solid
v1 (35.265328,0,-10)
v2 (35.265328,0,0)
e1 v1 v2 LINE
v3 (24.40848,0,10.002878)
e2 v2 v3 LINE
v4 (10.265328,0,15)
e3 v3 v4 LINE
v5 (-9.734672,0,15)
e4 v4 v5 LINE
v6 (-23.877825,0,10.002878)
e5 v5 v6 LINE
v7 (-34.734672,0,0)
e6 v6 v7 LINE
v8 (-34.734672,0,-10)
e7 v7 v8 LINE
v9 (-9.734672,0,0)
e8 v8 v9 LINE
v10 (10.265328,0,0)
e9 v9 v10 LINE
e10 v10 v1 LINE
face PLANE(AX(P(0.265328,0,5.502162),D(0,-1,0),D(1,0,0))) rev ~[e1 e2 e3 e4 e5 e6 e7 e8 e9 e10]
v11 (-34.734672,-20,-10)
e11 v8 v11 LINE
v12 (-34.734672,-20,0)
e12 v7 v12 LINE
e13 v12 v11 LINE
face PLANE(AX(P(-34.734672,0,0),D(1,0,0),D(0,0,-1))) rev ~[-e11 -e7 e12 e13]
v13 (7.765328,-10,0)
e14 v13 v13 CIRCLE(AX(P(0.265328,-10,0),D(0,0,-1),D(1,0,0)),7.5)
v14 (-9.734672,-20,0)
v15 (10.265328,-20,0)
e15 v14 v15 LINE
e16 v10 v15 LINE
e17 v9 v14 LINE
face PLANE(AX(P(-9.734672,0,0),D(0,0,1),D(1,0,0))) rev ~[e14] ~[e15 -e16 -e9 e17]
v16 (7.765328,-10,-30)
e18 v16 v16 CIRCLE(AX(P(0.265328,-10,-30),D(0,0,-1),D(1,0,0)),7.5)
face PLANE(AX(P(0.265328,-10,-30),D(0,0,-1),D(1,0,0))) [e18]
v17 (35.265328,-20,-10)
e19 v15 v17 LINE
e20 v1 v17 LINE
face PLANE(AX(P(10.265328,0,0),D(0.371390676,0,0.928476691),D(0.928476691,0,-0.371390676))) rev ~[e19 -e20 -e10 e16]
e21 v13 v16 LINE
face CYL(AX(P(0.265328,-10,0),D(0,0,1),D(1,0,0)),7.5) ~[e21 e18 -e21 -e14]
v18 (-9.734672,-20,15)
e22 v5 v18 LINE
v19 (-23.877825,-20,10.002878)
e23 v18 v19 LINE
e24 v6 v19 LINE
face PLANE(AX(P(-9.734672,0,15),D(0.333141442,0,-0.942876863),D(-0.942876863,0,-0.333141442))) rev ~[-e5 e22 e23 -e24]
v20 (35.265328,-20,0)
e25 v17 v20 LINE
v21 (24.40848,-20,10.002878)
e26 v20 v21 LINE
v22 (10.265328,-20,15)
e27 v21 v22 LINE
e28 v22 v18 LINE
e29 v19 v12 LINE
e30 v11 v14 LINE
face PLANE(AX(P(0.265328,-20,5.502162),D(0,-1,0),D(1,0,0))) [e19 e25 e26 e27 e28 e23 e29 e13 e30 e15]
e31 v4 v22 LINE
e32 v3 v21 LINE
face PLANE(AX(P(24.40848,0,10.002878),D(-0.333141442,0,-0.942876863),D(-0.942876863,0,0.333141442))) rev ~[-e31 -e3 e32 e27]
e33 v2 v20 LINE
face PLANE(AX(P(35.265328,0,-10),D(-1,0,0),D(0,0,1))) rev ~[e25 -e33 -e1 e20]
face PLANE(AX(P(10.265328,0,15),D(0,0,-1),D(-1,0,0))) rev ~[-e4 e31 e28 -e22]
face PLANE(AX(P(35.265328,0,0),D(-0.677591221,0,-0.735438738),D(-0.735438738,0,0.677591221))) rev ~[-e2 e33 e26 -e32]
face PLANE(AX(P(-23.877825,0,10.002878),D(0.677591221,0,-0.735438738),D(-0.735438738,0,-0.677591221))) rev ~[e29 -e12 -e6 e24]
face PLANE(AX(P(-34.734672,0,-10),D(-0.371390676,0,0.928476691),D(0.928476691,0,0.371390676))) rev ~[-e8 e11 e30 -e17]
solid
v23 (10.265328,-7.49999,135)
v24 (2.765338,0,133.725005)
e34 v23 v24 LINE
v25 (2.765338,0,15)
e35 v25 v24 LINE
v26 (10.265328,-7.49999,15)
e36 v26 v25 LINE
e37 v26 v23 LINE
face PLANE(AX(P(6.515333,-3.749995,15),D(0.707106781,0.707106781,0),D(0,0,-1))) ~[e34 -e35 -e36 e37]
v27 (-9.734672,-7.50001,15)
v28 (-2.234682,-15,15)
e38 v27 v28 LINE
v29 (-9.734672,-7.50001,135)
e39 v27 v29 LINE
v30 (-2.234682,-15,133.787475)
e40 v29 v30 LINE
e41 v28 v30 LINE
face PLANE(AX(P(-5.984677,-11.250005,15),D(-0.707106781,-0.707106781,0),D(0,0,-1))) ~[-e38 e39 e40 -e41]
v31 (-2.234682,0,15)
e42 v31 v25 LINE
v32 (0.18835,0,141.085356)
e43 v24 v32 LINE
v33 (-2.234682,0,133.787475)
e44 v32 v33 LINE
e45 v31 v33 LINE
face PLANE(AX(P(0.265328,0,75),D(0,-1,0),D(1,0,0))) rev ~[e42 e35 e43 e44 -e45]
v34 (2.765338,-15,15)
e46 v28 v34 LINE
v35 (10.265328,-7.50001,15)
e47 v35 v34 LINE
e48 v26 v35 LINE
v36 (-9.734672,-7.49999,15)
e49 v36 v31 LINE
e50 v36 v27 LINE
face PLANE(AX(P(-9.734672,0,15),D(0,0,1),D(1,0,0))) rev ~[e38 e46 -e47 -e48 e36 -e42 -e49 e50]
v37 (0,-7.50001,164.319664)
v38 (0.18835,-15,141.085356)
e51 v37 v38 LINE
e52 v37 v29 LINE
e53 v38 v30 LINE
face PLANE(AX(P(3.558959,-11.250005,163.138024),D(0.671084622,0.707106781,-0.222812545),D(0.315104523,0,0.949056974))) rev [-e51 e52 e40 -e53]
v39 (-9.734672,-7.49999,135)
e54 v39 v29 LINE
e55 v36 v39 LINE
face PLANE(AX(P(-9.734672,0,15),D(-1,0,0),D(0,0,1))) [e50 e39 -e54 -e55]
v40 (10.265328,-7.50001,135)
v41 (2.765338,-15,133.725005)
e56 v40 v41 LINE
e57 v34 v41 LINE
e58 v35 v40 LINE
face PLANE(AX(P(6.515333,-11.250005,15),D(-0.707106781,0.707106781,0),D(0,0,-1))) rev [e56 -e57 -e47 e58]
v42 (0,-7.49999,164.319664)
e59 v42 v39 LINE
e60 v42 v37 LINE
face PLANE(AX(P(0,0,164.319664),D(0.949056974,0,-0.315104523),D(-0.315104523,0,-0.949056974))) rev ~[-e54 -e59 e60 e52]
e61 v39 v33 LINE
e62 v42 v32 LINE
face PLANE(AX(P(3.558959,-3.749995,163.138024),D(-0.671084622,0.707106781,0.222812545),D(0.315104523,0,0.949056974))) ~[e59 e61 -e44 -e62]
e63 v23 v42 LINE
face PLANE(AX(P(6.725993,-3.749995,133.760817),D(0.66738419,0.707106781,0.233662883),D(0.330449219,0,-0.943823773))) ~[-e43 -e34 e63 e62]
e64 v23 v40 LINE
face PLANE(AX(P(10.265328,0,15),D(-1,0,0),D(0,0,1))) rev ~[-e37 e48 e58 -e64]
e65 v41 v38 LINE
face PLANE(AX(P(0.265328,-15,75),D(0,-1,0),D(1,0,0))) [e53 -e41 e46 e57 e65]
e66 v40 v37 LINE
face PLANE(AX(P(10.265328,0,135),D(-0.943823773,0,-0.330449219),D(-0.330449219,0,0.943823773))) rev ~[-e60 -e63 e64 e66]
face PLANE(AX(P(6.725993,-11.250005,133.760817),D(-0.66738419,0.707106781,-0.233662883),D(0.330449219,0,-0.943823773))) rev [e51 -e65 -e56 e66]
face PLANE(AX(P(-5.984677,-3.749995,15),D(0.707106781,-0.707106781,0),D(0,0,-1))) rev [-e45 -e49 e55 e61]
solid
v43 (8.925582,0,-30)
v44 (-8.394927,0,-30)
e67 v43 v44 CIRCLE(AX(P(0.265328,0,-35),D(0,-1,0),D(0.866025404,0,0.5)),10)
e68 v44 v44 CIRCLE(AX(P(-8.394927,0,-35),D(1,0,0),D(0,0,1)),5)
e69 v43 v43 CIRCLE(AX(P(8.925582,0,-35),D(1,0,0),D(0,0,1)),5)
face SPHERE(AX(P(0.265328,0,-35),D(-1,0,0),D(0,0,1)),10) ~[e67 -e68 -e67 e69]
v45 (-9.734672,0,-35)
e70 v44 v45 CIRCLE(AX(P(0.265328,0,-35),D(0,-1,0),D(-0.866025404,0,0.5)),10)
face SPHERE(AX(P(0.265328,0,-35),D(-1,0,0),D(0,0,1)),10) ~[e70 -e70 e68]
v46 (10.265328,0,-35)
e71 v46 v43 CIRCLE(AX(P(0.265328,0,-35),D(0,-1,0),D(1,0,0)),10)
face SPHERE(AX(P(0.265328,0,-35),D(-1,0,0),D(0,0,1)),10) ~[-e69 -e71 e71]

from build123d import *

# Parameters (mm, degrees)
F1_DEPTH = 20
F0_W     = 20
F0_H     = 120
F2_DEPTH = 15
F3_SIZE  = 7.49999
F5_R     = 7.5
F6_DEPTH = 30


# Not quite as in the source:
# - a fillet or chamfer is up to 0.001 mm smaller than in the source, because OpenCascade refuses the exact size


with BuildPart() as f1:
    # F0 (on Front) → F1 (new body)
    with BuildSketch(Plane.XZ):
        Polygon((-23.8778254464, 10.0028783713), (-34.7346724942, 0), (-9.7346724942, 0), (10.2653275058, 0), (35.2653275058, 0), (24.4084804579, 10.0028783713), (10.2653275058, 15), (-9.7346724942, 15), align=None)
        Polygon((-9.7346724942, 0), (-34.7346724942, 0), (-34.7346724942, -10), align=None)
        Polygon((35.2653275058, 0), (10.2653275058, 0), (35.2653275058, -10), align=None)
    extrude(amount=F1_DEPTH)

    # F5 (on face) → F6 (join)
    with BuildSketch(Plane(origin=(0, 0, 0), x_dir=(1, 0, 0), z_dir=(0, 0, -1))):
        with Locations((0.2653275058, 10)):
            Circle(F5_R)
    extrude(amount=F6_DEPTH)


with BuildPart() as f2:
    # F0 (on Front) → F2 (new body)
    with BuildSketch(Plane.XZ):
        with Locations((0.2653275058, 75)):
            Rectangle(F0_W, F0_H)
        Polygon((0, 164.3196642399), (-9.7346724942, 135), (10.2653275058, 135), align=None)
    extrude(amount=F2_DEPTH)

    # F3 (size 7.5 in the source; OpenCascade refuses exactly that, so slightly less here)
    f3_edges = [f2.edges().sort_by_distance(p)[0] for p in [
        (-9.734672, -15, 75),
        (-9.734672, 0, 75),
        (10.265328, 0, 75),
        (10.265328, -15, 75),
        (5.132664, 0, 149.659832),
        (5.132664, -15, 149.659832),
        (-4.867336, -15, 149.659832),
        (-4.867336, 0, 149.659832),
    ]]
    chamfer(f3_edges, length=F3_SIZE)


with BuildPart() as f4:
    # F0 (on Front) → F4 (revolve)
    with BuildSketch(Plane.XZ):
        with BuildLine():
            Line((8.9255815436, -30), (-8.3949265321, -30))
            ThreePointArc((-8.3949265321, -30), (-9.3939307571, -32.411809549), (-9.7346724942, -35))
            Line((-9.7346724942, -35), (10.2653275058, -35))
            ThreePointArc((10.2653275058, -35), (9.9245857687, -32.411809549), (8.9255815436, -30))
        make_face()
        with BuildLine():
            ThreePointArc((8.9255815436, -30), (0.2653275058, -25), (-8.3949265321, -30))
            Line((-8.3949265321, -30), (8.9255815436, -30))
        make_face()
    revolve(axis=Axis((0.2653275058, 0, -35), (1, 0, 0)))


solid = Compound([f1.part, f2.part, f4.part])
